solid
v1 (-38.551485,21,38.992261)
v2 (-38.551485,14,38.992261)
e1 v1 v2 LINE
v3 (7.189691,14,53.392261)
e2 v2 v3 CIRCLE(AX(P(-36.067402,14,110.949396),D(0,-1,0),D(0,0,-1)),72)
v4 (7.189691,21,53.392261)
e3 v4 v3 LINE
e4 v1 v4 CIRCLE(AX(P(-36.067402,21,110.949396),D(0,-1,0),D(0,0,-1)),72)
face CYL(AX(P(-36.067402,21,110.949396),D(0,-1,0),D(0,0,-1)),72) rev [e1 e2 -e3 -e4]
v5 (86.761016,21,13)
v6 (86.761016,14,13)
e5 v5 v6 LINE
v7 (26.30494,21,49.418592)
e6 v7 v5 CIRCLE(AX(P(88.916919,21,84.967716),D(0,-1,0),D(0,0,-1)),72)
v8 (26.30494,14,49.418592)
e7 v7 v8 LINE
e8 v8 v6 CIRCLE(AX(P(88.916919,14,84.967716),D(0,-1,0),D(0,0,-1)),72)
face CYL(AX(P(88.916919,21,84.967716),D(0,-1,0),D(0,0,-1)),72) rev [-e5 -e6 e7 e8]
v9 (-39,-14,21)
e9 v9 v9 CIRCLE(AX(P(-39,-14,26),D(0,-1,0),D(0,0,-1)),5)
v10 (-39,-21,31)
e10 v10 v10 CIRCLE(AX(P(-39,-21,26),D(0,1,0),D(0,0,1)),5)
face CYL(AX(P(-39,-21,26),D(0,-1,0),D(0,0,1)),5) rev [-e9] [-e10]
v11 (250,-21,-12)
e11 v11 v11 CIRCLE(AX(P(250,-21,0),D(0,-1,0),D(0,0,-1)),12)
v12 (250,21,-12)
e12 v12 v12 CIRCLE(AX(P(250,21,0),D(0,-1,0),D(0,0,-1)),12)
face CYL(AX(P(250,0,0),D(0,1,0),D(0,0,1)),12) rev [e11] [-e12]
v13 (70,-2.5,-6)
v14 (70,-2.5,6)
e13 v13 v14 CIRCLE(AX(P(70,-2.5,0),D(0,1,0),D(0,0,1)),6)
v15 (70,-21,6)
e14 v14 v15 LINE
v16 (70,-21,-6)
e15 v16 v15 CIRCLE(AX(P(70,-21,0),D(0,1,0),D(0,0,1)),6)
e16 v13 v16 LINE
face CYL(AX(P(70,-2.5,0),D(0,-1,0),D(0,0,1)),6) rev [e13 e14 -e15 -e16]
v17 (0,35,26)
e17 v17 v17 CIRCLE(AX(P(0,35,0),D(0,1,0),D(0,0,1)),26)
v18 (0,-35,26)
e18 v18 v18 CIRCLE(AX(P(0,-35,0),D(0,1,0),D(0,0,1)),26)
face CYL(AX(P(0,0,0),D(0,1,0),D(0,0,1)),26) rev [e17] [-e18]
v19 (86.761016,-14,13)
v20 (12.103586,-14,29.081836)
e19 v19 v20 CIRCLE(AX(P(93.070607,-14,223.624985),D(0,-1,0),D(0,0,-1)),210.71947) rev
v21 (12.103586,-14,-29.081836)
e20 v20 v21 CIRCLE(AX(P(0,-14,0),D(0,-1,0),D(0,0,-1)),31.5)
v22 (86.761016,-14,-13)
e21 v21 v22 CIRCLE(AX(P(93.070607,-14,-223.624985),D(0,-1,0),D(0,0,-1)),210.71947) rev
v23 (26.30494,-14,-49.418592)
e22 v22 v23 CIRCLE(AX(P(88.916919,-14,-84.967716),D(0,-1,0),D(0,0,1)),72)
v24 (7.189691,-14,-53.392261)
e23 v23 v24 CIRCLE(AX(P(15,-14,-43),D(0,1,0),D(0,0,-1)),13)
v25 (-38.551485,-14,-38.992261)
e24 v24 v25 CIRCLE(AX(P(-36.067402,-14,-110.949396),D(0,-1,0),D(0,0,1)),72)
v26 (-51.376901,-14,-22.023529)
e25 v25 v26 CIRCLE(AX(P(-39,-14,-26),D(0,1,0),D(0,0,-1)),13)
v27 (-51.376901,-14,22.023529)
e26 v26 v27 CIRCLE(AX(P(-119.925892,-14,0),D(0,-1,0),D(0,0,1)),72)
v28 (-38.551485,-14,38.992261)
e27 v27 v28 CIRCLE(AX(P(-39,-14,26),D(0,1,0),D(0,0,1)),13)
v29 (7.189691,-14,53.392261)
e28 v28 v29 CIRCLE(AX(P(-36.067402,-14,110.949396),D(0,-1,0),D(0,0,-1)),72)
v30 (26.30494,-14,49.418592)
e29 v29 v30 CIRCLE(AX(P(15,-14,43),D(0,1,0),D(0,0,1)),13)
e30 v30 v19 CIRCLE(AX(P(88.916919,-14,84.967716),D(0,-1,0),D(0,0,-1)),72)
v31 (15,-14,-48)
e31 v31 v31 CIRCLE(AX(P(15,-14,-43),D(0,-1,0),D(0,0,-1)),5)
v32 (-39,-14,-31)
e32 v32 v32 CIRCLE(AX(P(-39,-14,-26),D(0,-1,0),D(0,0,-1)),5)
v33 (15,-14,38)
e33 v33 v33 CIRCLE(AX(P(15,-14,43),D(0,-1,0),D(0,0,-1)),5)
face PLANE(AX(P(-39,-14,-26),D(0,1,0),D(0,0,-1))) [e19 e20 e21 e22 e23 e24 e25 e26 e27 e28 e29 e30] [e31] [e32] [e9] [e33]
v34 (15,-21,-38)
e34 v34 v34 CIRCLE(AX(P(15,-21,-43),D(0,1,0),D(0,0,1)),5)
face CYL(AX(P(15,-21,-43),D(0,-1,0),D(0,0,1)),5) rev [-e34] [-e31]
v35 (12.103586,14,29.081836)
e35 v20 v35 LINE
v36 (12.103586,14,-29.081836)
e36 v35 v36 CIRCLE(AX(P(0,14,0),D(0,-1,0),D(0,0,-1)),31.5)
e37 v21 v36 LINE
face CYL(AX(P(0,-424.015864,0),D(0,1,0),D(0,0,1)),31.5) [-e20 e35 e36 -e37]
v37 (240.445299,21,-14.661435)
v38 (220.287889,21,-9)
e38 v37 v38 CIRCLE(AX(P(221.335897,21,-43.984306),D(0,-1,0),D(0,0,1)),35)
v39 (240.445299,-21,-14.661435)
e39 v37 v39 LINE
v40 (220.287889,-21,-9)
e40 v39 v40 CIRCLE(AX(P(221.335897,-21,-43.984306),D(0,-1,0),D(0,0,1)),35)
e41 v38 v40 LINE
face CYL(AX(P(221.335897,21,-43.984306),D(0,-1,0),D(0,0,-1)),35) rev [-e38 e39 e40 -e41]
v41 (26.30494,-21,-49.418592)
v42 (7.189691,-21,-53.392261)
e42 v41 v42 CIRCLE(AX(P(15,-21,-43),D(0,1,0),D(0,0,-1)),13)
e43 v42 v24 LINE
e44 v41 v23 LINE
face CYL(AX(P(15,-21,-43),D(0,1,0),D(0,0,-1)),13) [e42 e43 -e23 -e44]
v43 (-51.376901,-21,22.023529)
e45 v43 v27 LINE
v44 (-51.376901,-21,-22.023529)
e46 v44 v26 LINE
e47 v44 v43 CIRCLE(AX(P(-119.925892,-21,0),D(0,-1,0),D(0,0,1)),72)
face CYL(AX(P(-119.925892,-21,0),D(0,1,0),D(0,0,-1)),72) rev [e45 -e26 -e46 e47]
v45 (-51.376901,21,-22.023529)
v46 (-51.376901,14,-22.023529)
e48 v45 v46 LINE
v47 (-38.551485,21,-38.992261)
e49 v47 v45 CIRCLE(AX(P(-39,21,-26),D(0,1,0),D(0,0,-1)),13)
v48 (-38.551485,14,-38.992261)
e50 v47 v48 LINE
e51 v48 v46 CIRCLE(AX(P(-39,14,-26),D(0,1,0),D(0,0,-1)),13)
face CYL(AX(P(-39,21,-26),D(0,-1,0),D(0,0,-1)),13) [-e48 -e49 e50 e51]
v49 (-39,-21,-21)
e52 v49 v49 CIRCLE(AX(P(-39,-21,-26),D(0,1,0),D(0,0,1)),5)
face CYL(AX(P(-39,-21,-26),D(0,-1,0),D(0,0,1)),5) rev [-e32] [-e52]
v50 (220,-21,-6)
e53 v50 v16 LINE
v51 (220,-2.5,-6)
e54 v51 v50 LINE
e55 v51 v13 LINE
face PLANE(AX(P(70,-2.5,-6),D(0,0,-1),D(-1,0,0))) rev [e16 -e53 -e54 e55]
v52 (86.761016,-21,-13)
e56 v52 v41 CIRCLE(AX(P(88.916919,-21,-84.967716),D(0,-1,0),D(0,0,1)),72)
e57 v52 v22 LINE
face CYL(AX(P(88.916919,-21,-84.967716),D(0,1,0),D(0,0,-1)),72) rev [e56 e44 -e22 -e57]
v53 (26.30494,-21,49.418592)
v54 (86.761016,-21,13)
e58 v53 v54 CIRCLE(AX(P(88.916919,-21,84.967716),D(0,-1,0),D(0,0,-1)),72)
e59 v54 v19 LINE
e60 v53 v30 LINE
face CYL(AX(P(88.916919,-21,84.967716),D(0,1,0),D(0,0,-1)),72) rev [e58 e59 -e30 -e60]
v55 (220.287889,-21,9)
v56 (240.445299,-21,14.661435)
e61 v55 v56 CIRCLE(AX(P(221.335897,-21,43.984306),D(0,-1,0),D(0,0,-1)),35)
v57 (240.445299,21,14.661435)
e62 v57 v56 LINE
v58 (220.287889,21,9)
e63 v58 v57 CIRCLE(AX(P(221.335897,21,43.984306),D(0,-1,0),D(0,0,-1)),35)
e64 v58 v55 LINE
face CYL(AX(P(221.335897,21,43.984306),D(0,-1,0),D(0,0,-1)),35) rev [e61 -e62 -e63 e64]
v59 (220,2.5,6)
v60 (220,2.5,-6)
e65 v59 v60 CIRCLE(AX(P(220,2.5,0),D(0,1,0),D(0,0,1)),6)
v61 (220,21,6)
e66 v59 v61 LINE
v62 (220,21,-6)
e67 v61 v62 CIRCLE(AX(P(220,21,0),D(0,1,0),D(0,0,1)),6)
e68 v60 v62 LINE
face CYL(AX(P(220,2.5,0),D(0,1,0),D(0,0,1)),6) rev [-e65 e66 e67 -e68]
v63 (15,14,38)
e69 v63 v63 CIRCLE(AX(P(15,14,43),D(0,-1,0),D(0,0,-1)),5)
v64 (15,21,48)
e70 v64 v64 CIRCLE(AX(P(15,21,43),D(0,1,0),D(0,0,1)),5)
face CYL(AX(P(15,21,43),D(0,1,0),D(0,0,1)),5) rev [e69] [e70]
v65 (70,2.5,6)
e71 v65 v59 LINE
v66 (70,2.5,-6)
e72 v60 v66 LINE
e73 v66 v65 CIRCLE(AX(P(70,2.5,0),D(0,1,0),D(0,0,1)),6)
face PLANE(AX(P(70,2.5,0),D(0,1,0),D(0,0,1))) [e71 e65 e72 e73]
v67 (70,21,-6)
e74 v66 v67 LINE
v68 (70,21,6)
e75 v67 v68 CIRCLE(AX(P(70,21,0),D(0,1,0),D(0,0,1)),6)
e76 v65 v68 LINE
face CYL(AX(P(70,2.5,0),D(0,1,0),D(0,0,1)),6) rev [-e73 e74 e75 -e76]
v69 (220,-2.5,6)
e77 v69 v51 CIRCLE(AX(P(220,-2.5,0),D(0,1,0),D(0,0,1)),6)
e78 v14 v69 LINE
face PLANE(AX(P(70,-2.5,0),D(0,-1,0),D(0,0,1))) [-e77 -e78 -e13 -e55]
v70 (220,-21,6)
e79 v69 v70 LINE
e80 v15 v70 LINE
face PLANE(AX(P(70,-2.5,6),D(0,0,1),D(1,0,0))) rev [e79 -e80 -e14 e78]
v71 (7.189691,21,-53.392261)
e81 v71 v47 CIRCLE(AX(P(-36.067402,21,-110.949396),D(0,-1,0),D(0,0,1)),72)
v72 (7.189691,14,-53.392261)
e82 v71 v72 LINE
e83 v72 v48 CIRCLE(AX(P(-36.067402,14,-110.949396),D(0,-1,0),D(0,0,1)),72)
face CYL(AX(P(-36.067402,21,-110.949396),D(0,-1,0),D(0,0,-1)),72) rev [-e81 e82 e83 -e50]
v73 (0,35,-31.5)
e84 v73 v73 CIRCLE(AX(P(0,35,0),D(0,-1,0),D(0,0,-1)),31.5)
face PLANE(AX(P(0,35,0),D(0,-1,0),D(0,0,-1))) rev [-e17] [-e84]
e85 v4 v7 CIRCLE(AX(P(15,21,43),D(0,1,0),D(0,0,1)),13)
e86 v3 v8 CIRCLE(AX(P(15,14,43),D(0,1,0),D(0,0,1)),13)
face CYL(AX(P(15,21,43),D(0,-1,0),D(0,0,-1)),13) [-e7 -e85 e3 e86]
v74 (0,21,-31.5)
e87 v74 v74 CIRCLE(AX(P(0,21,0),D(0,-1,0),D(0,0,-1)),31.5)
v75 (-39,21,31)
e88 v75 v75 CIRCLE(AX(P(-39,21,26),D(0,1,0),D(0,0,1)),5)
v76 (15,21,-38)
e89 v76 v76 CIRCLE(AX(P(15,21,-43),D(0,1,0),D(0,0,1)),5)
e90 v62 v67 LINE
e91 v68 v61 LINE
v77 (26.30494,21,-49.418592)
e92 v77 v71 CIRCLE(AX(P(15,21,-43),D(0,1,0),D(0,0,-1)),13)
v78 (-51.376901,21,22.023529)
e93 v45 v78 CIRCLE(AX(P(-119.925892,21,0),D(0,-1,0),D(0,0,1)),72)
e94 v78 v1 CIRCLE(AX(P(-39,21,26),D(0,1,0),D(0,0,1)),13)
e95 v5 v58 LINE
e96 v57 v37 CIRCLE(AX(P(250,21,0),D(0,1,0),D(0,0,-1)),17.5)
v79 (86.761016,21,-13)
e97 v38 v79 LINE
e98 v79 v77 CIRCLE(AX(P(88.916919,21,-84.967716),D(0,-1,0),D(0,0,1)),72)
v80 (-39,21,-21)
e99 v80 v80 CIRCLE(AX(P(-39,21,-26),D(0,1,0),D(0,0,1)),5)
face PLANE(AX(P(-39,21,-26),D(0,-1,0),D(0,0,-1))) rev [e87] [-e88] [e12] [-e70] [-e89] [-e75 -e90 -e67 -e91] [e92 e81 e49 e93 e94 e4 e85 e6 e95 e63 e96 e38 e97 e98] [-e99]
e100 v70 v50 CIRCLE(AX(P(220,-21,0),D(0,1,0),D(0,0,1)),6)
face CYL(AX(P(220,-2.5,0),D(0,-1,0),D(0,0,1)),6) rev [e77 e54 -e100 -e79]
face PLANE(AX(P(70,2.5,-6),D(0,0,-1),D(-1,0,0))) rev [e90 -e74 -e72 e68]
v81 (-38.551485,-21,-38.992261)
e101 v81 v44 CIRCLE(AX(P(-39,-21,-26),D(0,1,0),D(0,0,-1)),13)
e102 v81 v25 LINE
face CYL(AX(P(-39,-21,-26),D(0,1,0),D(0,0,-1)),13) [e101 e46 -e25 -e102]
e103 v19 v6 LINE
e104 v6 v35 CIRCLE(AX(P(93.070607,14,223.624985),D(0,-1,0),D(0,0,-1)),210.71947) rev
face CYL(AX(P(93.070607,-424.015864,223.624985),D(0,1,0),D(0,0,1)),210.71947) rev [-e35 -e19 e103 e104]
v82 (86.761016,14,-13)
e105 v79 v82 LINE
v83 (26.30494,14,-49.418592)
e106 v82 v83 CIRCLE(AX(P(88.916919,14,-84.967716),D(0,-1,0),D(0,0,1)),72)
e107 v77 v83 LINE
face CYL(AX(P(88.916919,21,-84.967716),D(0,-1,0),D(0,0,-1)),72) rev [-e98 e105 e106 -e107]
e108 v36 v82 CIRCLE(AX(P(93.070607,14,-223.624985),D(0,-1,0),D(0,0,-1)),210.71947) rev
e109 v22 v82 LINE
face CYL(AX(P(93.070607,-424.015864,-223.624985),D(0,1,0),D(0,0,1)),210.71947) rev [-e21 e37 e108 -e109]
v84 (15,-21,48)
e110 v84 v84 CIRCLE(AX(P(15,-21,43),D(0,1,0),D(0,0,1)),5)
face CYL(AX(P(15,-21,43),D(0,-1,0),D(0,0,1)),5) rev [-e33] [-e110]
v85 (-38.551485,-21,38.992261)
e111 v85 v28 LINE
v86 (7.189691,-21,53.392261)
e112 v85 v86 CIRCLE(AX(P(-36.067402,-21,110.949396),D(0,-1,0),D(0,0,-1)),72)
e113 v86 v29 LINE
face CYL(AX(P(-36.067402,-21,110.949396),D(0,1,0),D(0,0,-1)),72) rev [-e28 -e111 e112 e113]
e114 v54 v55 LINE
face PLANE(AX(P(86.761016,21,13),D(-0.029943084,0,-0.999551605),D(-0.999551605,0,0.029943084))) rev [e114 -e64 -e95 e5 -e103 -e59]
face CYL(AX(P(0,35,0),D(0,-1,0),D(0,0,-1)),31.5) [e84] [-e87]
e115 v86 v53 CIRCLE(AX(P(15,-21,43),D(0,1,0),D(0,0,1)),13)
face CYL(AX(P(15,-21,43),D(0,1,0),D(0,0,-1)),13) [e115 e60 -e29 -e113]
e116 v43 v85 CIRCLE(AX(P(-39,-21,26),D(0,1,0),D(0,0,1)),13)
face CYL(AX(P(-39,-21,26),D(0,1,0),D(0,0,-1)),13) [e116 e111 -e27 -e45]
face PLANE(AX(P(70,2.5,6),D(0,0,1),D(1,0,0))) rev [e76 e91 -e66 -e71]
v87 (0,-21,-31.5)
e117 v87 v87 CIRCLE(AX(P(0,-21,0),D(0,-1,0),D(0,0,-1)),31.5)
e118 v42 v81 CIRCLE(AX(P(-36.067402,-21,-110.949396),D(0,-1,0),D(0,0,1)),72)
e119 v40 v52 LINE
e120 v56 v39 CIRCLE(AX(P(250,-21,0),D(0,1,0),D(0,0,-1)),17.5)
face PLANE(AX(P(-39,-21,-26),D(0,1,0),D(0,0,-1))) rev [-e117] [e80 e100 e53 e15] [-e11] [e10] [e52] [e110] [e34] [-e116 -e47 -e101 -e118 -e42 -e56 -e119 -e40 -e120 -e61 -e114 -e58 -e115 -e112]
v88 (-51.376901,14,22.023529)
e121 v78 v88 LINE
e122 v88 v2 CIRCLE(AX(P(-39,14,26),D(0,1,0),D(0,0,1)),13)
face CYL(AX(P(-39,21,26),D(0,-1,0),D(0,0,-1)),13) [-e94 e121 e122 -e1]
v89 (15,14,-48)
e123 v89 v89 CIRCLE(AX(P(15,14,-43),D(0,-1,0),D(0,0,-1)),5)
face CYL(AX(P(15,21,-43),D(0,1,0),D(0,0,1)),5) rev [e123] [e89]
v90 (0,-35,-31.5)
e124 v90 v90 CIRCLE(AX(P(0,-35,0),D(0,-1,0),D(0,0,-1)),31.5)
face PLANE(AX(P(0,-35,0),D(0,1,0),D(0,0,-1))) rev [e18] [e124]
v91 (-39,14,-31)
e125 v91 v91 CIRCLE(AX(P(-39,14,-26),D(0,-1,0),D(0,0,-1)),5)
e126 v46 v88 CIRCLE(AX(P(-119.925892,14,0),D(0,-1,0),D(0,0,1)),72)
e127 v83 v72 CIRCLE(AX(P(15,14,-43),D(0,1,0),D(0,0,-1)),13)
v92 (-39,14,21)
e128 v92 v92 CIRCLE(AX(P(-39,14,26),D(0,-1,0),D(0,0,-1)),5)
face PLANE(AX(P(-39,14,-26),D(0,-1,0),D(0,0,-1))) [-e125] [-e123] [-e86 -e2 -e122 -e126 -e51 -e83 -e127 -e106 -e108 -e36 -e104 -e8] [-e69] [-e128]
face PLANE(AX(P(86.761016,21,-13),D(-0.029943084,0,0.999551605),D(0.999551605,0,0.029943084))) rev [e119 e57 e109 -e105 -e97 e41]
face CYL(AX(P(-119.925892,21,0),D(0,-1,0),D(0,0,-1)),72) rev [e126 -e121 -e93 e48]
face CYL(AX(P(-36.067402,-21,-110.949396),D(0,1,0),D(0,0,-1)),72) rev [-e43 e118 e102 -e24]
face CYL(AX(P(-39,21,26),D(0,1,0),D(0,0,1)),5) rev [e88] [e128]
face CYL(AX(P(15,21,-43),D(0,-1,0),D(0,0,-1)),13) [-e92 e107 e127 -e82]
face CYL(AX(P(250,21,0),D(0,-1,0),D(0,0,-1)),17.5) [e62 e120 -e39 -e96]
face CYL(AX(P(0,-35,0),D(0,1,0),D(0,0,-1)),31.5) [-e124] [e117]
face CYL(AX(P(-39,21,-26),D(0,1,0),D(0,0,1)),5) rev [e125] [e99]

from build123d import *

# Parameters (mm, degrees)
BOSS_EXTRUDE1_DEPTH   = 21
CUT_EXTRUDE1_START    = -14
CUT_EXTRUDE1_DEPTH    = 14
BOSS_EXTRUDE2_START   = -35
BOSS_EXTRUDE2_DEPTH   = 35
SKETCH5_R             = 26
SKETCH5_R_2           = 12
CUT_EXTRUDE2_DEPTH    = 276.530851267
CUT_EXTRUDE3_DEPTH    = 18.5
F_1_0MM_DOWEL_HOLE1_D = 10


# Read off the part's stored shape, not the designer's step: Cut-Extrude1
with BuildPart() as part:
    # Sketch1 → Boss-Extrude1 (new body)
    with BuildSketch(Plane(origin=(0, 0, 0), x_dir=(1, 0, 0), z_dir=(0, 1, 0))):
        with BuildLine():
            Line((86.761016473, 13), (220.287888894, 9))
            ThreePointArc((220.287888894, 9), (230.799852276, 10.288111331), (240.44529895, 14.661435395))
            ThreePointArc((240.44529895, 14.661435395), (267.5, 0), (240.44529895, -14.661435395))
            ThreePointArc((240.44529895, -14.661435395), (230.799852276, -10.288111331), (220.287888894, -9))
            Line((220.287888894, -9), (86.761016473, -13))
            ThreePointArc((86.761016473, -13), (51.764556155, -23.293555937), (26.304940485, -49.418591795))
            ThreePointArc((26.304940485, -49.418591795), (17.645869205, -55.727897554), (7.189691393, -53.392260556))
            ThreePointArc((7.189691393, -53.392260556), (-14.44681941, -42.272249892), (-38.551485077, -38.992260556))
            ThreePointArc((-38.551485077, -38.992260556), (-49.370923708, -33.838618593), (-51.376901133, -22.023529412))
            ThreePointArc((-51.376901133, -22.023529412), (-47.925892025, 0), (-51.376901133, 22.023529412))
            ThreePointArc((-51.376901133, 22.023529412), (-49.370923708, 33.838618593), (-38.551485077, 38.992260556))
            ThreePointArc((-38.551485077, 38.992260556), (-14.44681941, 42.272249892), (7.189691393, 53.392260556))
            ThreePointArc((7.189691393, 53.392260556), (17.645869205, 55.727897554), (26.304940485, 49.418591795))
            ThreePointArc((26.304940485, 49.418591795), (51.764556155, 23.293555937), (86.761016473, 13))
        make_face()
    extrude(amount=BOSS_EXTRUDE1_DEPTH)

    # Cut-Extrude1 outline → Cut-Extrude1 (cut)
    with BuildSketch(Plane.XZ.offset(CUT_EXTRUDE1_START)):
        with BuildLine():
            ThreePointArc((86.761016473, -13), (48.697663607, -17.630477543), (12.103585769, -29.081836454))
            ThreePointArc((12.103585769, -29.081836454), (-31.5, 0), (12.103585769, 29.081836454))
            ThreePointArc((12.103585769, 29.081836454), (48.697663607, 17.630477543), (86.761016473, 13))
            ThreePointArc((86.761016473, 13), (51.764556155, 23.293555937), (26.304940485, 49.418591795))
            ThreePointArc((26.304940485, 49.418591795), (17.645869204, 55.727897554), (7.189691393, 53.392260556))
            ThreePointArc((7.189691393, 53.392260556), (-14.446819411, 42.272249892), (-38.551485077, 38.992260556))
            ThreePointArc((-38.551485077, 38.992260556), (-49.370923708, 33.838618593), (-51.376901133, 22.023529412))
            ThreePointArc((-51.376901133, 22.023529412), (-47.925892025, 0), (-51.376901133, -22.023529412))
            ThreePointArc((-51.376901133, -22.023529412), (-49.370923708, -33.838618593), (-38.551485077, -38.992260556))
            ThreePointArc((-38.551485077, -38.992260556), (-14.446819411, -42.272249892), (7.189691393, -53.392260556))
            ThreePointArc((7.189691393, -53.392260556), (17.645869204, -55.727897554), (26.304940485, -49.418591795))
            ThreePointArc((26.304940485, -49.418591795), (51.764556155, -23.293555937), (86.761016473, -13))
        make_face()
    extrude(amount=CUT_EXTRUDE1_DEPTH, mode=Mode.SUBTRACT)

    # Sketch3 → Boss-Extrude2 (add)
    with BuildSketch(Plane.XZ.offset(BOSS_EXTRUDE2_START)):
        with BuildLine():
            ThreePointArc((12.103585769, -29.081836454), (26.20603892, -17.47837304), (31.5, 0))
            ThreePointArc((31.5, 0), (26.20603892, 17.47837304), (12.103585769, 29.081836454))
            ThreePointArc((12.103585769, 29.081836454), (-31.5, 0), (12.103585769, -29.081836454))
        make_face()
    extrude(amount=BOSS_EXTRUDE2_DEPTH)

    # Sketch5 → Cut-Extrude2 (cut, through all)
    with BuildSketch(Plane(origin=(0, 35, 0), x_dir=(1, 0, 0), z_dir=(0, 1, 0))):
        with Locations(Location((0, 0, 0), (0, 0, 270))):
            Circle(SKETCH5_R)
        with Locations(Location((250, 0, 0), (0, 0, 270))):
            Circle(SKETCH5_R_2)
    extrude(amount=-CUT_EXTRUDE2_DEPTH, mode=Mode.SUBTRACT)

    # Sketch6 → Cut-Extrude3 (cut)
    with BuildSketch(Plane(origin=(0, 21, 0), x_dir=(1, 0, 0), z_dir=(0, 1, 0))):
        with BuildLine():
            Line((70, 6), (220, 6))
            ThreePointArc((220, 6), (226, 0), (220, -6))
            Line((220, -6), (70, -6))
            ThreePointArc((70, -6), (64, 0), (70, 6))
        make_face()
    extrude(amount=-CUT_EXTRUDE3_DEPTH, mode=Mode.SUBTRACT)

    # Ø1.0mm Dowel Hole1 (through all)
    with Locations(Plane(origin=(15, 21, 43), x_dir=(0, 0, 1), z_dir=(0, 1, 0))):
        with Locations((0, 0)):
            f_1_0mm_dowel_hole1 = Hole(F_1_0MM_DOWEL_HOLE1_D / 2)

    # Sketch-Pattern1: Ø1.0mm Dowel Hole1 at 3 more places
    with Locations((-54, 0, -69), (-54, 0, -17), (0, 0, -86)):
        add(f_1_0mm_dowel_hole1, mode=Mode.SUBTRACT)

    # Mirror1: part across plane


with BuildPart() as part_1:
    add(part.part)
    add(part.part.mirror(Plane(origin=(-39, 0, -26), x_dir=(0, 0, 1), z_dir=(0, -1, 0))))


solid = part_1.part
